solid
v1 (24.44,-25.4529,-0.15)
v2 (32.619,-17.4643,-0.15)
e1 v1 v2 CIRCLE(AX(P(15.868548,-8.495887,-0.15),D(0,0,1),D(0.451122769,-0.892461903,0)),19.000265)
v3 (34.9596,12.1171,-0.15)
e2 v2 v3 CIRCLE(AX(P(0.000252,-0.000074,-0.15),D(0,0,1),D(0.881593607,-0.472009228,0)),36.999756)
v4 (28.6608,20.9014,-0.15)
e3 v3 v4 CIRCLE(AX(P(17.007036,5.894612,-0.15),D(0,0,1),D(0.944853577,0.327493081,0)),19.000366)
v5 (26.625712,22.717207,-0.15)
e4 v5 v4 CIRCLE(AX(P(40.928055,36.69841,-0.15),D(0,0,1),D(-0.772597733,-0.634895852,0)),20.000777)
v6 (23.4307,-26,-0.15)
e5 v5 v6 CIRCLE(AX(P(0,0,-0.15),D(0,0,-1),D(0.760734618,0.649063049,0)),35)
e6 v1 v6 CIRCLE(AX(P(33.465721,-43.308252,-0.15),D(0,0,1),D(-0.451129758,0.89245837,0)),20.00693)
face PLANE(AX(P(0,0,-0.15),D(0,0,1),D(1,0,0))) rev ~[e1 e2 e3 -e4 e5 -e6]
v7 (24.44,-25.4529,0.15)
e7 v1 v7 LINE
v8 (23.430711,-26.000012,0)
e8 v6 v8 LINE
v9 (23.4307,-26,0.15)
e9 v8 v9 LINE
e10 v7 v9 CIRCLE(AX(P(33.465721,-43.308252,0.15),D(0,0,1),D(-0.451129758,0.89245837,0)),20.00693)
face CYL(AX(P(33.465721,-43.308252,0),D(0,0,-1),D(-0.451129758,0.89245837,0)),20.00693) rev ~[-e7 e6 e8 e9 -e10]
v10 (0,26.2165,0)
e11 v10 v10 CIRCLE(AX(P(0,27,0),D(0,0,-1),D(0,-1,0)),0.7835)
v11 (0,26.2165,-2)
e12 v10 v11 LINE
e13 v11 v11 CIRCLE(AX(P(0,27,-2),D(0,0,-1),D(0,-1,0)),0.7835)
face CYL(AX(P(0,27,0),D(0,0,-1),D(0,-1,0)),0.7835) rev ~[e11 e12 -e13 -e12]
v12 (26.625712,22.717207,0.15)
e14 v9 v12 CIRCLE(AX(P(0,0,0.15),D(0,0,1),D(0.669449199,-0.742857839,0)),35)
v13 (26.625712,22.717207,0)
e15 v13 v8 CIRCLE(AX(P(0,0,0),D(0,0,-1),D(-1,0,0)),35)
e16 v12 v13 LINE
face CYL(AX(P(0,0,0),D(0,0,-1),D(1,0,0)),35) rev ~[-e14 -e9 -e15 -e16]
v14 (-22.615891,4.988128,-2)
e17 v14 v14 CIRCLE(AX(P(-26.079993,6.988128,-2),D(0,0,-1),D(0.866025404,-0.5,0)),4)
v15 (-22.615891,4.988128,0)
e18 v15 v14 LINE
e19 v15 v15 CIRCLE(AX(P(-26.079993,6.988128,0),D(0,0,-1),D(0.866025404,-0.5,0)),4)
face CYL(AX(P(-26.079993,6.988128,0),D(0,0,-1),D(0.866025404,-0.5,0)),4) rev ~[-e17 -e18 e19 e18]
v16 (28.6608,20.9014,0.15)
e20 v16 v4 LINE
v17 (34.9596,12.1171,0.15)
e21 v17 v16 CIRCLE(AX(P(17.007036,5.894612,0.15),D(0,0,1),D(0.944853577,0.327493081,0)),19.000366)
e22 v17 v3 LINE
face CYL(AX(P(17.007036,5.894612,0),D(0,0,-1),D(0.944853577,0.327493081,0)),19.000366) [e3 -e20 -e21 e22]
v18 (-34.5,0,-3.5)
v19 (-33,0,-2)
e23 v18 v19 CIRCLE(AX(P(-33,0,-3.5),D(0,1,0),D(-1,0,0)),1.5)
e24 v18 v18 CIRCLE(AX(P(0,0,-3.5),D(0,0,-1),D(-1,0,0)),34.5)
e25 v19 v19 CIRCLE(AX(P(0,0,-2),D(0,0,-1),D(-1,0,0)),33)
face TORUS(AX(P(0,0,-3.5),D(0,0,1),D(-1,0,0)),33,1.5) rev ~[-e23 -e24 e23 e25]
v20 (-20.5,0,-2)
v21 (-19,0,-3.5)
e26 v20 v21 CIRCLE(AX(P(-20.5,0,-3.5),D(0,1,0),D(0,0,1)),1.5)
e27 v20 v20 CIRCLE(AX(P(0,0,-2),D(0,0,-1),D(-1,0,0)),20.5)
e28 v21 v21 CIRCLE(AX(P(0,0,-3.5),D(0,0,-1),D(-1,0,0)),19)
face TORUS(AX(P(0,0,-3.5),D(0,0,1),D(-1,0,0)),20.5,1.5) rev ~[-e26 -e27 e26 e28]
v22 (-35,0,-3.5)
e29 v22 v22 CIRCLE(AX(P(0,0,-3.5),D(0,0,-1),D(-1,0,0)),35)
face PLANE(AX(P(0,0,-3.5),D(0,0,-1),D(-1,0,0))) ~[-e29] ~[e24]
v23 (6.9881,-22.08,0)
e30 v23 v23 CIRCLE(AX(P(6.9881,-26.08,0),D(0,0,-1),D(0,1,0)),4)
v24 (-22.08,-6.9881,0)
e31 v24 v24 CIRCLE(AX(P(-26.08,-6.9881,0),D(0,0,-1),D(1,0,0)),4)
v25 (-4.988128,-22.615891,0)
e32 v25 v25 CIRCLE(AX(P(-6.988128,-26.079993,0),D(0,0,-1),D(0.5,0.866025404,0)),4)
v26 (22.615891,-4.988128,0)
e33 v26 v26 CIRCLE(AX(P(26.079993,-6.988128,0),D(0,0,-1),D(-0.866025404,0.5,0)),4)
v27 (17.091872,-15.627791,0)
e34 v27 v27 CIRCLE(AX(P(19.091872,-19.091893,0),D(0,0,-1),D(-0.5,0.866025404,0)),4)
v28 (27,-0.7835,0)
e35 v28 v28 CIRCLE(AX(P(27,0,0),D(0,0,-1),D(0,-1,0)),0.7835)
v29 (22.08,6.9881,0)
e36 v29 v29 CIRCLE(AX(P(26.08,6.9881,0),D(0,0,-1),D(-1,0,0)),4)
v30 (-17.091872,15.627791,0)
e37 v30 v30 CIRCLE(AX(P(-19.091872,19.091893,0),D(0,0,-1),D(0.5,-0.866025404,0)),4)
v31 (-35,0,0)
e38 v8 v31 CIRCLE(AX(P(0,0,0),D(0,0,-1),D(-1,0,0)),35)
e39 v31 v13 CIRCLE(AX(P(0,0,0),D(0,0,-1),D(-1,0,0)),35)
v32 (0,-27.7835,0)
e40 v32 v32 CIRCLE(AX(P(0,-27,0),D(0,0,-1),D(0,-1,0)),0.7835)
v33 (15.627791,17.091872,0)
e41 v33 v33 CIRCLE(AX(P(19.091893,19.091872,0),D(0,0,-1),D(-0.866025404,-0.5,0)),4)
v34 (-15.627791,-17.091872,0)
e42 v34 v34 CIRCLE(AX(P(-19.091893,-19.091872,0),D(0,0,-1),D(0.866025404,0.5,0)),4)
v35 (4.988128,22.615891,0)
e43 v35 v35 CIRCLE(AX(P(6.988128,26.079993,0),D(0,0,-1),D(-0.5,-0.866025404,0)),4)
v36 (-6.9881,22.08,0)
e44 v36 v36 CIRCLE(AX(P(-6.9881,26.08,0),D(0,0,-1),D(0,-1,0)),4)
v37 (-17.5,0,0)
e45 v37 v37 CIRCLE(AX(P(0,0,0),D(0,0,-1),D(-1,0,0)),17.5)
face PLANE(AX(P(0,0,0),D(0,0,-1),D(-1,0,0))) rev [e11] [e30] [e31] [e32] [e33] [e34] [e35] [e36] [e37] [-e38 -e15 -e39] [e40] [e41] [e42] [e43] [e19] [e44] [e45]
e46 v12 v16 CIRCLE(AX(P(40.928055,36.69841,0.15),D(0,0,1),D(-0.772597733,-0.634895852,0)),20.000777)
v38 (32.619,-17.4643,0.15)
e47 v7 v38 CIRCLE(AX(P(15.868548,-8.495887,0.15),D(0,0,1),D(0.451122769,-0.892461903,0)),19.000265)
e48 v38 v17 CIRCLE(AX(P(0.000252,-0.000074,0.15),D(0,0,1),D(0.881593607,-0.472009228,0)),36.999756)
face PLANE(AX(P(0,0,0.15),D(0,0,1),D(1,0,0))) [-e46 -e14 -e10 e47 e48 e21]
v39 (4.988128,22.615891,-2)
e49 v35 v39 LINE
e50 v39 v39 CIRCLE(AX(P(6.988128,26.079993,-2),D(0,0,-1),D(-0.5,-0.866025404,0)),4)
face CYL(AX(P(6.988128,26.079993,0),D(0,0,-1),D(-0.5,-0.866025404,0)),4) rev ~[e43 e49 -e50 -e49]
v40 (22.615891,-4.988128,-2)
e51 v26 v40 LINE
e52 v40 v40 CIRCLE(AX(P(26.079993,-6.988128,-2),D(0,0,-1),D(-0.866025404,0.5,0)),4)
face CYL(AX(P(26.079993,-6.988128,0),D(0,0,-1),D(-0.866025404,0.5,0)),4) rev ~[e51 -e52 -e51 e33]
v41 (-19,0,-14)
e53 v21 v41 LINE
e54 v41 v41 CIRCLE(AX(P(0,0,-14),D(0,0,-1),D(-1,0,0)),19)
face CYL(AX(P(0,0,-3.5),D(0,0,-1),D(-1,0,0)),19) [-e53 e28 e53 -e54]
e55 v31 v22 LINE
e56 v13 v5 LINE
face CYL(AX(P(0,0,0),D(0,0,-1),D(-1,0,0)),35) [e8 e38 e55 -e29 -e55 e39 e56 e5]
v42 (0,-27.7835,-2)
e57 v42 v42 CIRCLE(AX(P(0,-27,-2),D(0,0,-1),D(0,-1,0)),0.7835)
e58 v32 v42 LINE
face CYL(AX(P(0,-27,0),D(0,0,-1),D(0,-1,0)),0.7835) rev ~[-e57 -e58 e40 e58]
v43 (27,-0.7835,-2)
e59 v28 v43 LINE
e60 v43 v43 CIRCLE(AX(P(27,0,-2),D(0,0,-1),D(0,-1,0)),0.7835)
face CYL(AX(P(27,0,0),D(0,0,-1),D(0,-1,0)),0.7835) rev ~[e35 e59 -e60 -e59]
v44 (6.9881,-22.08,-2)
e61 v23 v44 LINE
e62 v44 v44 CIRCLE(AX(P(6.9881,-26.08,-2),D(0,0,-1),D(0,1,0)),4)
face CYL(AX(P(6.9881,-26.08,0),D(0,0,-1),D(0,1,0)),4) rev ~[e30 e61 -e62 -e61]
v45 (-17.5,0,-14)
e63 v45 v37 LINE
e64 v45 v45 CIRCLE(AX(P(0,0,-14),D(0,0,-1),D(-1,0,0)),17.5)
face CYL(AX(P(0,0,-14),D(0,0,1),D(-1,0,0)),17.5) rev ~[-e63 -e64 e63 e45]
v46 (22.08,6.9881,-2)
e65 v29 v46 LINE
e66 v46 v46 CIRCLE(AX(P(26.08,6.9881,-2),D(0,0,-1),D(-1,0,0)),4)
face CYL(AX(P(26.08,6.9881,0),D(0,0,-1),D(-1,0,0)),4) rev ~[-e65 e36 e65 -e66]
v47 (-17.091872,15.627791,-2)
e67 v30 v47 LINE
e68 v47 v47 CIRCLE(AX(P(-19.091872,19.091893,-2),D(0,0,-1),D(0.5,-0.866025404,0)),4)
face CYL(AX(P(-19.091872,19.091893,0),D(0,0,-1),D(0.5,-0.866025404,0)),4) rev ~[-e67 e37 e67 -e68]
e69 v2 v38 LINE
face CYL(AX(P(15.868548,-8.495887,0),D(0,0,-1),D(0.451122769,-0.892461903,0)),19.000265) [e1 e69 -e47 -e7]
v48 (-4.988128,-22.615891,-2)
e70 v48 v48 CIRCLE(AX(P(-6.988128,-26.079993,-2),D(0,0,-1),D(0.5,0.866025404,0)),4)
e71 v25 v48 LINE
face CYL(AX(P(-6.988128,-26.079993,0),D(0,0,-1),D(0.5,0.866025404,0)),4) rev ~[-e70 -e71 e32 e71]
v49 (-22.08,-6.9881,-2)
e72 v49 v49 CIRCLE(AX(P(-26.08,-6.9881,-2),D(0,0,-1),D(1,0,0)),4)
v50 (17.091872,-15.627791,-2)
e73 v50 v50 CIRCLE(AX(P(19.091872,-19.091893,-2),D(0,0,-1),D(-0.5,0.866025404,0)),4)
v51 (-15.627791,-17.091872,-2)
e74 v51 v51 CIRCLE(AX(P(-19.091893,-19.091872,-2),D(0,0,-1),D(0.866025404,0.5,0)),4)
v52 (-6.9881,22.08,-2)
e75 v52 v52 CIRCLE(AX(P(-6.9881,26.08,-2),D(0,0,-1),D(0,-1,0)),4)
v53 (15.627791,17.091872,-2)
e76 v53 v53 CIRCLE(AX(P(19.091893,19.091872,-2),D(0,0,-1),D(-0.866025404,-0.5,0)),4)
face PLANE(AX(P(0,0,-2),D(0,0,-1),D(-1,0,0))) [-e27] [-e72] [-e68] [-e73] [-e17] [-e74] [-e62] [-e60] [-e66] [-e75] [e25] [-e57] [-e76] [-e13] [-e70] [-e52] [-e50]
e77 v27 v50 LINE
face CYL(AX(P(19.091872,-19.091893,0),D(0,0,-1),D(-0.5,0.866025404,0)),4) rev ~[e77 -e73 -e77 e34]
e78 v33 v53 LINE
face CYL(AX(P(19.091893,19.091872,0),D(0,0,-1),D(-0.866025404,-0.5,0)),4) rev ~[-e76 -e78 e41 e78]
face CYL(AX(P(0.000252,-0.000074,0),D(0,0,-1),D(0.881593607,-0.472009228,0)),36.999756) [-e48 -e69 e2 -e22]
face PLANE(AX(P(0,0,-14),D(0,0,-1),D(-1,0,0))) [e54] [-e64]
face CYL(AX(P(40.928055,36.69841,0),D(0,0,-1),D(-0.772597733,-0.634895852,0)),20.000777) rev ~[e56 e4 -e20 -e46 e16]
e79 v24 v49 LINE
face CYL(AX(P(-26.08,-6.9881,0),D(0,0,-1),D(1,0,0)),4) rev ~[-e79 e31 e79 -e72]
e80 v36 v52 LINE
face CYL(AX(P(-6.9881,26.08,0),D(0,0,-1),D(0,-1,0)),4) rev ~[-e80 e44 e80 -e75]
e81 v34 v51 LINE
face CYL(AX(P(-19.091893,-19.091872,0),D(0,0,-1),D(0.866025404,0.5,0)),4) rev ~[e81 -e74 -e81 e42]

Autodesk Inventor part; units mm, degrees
ref_plane "YZ Plane" through (0, 0, 0) normal (1, 0, 0) x (0, 1, 0)
ref_plane "XZ Plane" through (0, 0, 0) normal (0, 1, 0) x (-1, 0, 0)
ref_plane "XY Plane" through (0, 0, 0) normal (0, 0, 1) x (1, 0, 0)
sketch "Skizze1" plane through (0, 0, 0) normal (0, 1, 0) x (-1, 0, 0)
  line L0 (17.5, 0) -> (35, 0)
  line L1 (35, 0) -> (35, -0.3)
  line L2 (35, -0.3) -> (35, -0.3)
  line L3 (35, -0.3) -> (35, -3.5)
  line L4 (19, -3.5) -> (19, -14)
  line L5 (19, -14) -> (17.5, -14)
  line L6 (17.5, -14) -> (17.5, 0)
  line L7 (0, 0) -> (0, -14)
  line L8 (35, -3.5) -> (35, -3.5)
  line L9 (33, -2) -> (20.5, -2)
  line L10 (20.5, -2) -> (20.5, -2)
  line L11 (35, -3.5) -> (35, -3.5)
  line L12 (20.5, -2) -> (20.5, -2)
  arc A0 (20.5, -2) -> (19, -3.5) centre (20.5, -3.5) ccw
  line L13 (34.5, -3.5) -> (34.5, -3.5)
  line L14 (34.5, -3.5) -> (35, -3.5)
  arc A1 (34.5, -3.5) -> (33, -2) centre (33, -3.5) ccw
  point P0 (19, -2)
  point P1 (35, -2)
  point P2 (34.5, -2)
  point P3 (0, -7)
  dimension "d1" = 14
  dimension "d3" = 35
  dimension "d4" = 38
  dimension "d5" = 70
  dimension "d10" = 2
  dimension "d11" = 1.5
  dimension "d34" = 69
  dimension "d35" = 1.5
  dimension "d36" = 3.5
revolve "Umdrehung1" add sketch "Skizze1" angle 360 about axis through (0, 0, 0) along (0, 0, -1)
sketch "Skizze2" plane through (0, 0, 0) normal (0, 0, 1) x (1, 0, 0)
  line L0 (0, 0) -> (0, 36.826) construction
  circle A0 centre (0, 0) radius 27 construction
  line L1 (0, 0) -> (-10.2306, 38.1811) construction
  line L2 (0, 0) -> (20.6417, 35.7525) construction
  point P0 (-6.9881, 26.08)
  dimension "d13" = 54
  dimension "d14" = 30
  dimension "d15" = 45
hole "Bohrung1" at (-6.9881, 26.08, 0) direction (0, 0, -1) diameter 8 depth 2
pattern_circular "Runde Anordnung1" count 12 over 360 about axis through (0, 0, -7) along (0, 0, -1) of "Bohrung1"
sketch "Skizze3" plane through (0, 0, 0) normal (0, 0, 1) x (1, 0, 0)
  circle A0 centre (0, 0) radius 27 construction
  point P0 (0, 0)
  point P1 (0, 27)
  point P2 (0, -27)
  point P3 (27, 0)
  dimension "d33" = 54
hole "Bohrung2" at (0, 27, 0) at (0, -27, 0) at (27, 0, 0) direction (0, 0, -1) diameter 1.567 depth 2 thread size "M2x0.4" class "6H" standard "ISO Metric profile"
sketch "Skizze4" plane through (0, 0, 0) normal (0, 0, 1) x (1, 0, 0)
  circle A0 centre (0, 0) radius 35 projected
  line L0 (0, 0) -> (68.1338, 0) construction
  arc A1 (32.619, -17.4643) -> (34.9596, 12.1171) centre (0, 0) ccw
  arc A2 (34.9596, 12.1171) -> (28.6608, 20.9014) centre (17.0074, 5.8948) ccw
  circle A3 centre (0, 0) radius 35 projected
  arc A4 (25.4755, 24) -> (28.6608, 20.9014) centre (40.9275, 36.6979) ccw
  arc A5 (24.44, -25.4529) -> (32.619, -17.4643) centre (15.8687, -8.4961) ccw
  arc A6 (24.44, -25.4529) -> (23.4307, -26) centre (33.4625, -43.3021) ccw
  point P0 (0, 0)
  point P1 (25.5164, 23.9565)
  point P2 (26.6259, 22.717)
  dimension "d43" = 74
  dimension "d47" = 19
  dimension "d48" = 20
  dimension "d49" = 19
  dimension "d50" = 20
  dimension "d51" = 50
  dimension "d52" = 80
  dimension "d53" = 24
  dimension "d54" = 26
extrude "Extrusion1" add sketch "Skizze4" along normal mid plane 0.3 contours A0 A4 A2 A1 A5 A6
properties part number "nockenscheibe"
